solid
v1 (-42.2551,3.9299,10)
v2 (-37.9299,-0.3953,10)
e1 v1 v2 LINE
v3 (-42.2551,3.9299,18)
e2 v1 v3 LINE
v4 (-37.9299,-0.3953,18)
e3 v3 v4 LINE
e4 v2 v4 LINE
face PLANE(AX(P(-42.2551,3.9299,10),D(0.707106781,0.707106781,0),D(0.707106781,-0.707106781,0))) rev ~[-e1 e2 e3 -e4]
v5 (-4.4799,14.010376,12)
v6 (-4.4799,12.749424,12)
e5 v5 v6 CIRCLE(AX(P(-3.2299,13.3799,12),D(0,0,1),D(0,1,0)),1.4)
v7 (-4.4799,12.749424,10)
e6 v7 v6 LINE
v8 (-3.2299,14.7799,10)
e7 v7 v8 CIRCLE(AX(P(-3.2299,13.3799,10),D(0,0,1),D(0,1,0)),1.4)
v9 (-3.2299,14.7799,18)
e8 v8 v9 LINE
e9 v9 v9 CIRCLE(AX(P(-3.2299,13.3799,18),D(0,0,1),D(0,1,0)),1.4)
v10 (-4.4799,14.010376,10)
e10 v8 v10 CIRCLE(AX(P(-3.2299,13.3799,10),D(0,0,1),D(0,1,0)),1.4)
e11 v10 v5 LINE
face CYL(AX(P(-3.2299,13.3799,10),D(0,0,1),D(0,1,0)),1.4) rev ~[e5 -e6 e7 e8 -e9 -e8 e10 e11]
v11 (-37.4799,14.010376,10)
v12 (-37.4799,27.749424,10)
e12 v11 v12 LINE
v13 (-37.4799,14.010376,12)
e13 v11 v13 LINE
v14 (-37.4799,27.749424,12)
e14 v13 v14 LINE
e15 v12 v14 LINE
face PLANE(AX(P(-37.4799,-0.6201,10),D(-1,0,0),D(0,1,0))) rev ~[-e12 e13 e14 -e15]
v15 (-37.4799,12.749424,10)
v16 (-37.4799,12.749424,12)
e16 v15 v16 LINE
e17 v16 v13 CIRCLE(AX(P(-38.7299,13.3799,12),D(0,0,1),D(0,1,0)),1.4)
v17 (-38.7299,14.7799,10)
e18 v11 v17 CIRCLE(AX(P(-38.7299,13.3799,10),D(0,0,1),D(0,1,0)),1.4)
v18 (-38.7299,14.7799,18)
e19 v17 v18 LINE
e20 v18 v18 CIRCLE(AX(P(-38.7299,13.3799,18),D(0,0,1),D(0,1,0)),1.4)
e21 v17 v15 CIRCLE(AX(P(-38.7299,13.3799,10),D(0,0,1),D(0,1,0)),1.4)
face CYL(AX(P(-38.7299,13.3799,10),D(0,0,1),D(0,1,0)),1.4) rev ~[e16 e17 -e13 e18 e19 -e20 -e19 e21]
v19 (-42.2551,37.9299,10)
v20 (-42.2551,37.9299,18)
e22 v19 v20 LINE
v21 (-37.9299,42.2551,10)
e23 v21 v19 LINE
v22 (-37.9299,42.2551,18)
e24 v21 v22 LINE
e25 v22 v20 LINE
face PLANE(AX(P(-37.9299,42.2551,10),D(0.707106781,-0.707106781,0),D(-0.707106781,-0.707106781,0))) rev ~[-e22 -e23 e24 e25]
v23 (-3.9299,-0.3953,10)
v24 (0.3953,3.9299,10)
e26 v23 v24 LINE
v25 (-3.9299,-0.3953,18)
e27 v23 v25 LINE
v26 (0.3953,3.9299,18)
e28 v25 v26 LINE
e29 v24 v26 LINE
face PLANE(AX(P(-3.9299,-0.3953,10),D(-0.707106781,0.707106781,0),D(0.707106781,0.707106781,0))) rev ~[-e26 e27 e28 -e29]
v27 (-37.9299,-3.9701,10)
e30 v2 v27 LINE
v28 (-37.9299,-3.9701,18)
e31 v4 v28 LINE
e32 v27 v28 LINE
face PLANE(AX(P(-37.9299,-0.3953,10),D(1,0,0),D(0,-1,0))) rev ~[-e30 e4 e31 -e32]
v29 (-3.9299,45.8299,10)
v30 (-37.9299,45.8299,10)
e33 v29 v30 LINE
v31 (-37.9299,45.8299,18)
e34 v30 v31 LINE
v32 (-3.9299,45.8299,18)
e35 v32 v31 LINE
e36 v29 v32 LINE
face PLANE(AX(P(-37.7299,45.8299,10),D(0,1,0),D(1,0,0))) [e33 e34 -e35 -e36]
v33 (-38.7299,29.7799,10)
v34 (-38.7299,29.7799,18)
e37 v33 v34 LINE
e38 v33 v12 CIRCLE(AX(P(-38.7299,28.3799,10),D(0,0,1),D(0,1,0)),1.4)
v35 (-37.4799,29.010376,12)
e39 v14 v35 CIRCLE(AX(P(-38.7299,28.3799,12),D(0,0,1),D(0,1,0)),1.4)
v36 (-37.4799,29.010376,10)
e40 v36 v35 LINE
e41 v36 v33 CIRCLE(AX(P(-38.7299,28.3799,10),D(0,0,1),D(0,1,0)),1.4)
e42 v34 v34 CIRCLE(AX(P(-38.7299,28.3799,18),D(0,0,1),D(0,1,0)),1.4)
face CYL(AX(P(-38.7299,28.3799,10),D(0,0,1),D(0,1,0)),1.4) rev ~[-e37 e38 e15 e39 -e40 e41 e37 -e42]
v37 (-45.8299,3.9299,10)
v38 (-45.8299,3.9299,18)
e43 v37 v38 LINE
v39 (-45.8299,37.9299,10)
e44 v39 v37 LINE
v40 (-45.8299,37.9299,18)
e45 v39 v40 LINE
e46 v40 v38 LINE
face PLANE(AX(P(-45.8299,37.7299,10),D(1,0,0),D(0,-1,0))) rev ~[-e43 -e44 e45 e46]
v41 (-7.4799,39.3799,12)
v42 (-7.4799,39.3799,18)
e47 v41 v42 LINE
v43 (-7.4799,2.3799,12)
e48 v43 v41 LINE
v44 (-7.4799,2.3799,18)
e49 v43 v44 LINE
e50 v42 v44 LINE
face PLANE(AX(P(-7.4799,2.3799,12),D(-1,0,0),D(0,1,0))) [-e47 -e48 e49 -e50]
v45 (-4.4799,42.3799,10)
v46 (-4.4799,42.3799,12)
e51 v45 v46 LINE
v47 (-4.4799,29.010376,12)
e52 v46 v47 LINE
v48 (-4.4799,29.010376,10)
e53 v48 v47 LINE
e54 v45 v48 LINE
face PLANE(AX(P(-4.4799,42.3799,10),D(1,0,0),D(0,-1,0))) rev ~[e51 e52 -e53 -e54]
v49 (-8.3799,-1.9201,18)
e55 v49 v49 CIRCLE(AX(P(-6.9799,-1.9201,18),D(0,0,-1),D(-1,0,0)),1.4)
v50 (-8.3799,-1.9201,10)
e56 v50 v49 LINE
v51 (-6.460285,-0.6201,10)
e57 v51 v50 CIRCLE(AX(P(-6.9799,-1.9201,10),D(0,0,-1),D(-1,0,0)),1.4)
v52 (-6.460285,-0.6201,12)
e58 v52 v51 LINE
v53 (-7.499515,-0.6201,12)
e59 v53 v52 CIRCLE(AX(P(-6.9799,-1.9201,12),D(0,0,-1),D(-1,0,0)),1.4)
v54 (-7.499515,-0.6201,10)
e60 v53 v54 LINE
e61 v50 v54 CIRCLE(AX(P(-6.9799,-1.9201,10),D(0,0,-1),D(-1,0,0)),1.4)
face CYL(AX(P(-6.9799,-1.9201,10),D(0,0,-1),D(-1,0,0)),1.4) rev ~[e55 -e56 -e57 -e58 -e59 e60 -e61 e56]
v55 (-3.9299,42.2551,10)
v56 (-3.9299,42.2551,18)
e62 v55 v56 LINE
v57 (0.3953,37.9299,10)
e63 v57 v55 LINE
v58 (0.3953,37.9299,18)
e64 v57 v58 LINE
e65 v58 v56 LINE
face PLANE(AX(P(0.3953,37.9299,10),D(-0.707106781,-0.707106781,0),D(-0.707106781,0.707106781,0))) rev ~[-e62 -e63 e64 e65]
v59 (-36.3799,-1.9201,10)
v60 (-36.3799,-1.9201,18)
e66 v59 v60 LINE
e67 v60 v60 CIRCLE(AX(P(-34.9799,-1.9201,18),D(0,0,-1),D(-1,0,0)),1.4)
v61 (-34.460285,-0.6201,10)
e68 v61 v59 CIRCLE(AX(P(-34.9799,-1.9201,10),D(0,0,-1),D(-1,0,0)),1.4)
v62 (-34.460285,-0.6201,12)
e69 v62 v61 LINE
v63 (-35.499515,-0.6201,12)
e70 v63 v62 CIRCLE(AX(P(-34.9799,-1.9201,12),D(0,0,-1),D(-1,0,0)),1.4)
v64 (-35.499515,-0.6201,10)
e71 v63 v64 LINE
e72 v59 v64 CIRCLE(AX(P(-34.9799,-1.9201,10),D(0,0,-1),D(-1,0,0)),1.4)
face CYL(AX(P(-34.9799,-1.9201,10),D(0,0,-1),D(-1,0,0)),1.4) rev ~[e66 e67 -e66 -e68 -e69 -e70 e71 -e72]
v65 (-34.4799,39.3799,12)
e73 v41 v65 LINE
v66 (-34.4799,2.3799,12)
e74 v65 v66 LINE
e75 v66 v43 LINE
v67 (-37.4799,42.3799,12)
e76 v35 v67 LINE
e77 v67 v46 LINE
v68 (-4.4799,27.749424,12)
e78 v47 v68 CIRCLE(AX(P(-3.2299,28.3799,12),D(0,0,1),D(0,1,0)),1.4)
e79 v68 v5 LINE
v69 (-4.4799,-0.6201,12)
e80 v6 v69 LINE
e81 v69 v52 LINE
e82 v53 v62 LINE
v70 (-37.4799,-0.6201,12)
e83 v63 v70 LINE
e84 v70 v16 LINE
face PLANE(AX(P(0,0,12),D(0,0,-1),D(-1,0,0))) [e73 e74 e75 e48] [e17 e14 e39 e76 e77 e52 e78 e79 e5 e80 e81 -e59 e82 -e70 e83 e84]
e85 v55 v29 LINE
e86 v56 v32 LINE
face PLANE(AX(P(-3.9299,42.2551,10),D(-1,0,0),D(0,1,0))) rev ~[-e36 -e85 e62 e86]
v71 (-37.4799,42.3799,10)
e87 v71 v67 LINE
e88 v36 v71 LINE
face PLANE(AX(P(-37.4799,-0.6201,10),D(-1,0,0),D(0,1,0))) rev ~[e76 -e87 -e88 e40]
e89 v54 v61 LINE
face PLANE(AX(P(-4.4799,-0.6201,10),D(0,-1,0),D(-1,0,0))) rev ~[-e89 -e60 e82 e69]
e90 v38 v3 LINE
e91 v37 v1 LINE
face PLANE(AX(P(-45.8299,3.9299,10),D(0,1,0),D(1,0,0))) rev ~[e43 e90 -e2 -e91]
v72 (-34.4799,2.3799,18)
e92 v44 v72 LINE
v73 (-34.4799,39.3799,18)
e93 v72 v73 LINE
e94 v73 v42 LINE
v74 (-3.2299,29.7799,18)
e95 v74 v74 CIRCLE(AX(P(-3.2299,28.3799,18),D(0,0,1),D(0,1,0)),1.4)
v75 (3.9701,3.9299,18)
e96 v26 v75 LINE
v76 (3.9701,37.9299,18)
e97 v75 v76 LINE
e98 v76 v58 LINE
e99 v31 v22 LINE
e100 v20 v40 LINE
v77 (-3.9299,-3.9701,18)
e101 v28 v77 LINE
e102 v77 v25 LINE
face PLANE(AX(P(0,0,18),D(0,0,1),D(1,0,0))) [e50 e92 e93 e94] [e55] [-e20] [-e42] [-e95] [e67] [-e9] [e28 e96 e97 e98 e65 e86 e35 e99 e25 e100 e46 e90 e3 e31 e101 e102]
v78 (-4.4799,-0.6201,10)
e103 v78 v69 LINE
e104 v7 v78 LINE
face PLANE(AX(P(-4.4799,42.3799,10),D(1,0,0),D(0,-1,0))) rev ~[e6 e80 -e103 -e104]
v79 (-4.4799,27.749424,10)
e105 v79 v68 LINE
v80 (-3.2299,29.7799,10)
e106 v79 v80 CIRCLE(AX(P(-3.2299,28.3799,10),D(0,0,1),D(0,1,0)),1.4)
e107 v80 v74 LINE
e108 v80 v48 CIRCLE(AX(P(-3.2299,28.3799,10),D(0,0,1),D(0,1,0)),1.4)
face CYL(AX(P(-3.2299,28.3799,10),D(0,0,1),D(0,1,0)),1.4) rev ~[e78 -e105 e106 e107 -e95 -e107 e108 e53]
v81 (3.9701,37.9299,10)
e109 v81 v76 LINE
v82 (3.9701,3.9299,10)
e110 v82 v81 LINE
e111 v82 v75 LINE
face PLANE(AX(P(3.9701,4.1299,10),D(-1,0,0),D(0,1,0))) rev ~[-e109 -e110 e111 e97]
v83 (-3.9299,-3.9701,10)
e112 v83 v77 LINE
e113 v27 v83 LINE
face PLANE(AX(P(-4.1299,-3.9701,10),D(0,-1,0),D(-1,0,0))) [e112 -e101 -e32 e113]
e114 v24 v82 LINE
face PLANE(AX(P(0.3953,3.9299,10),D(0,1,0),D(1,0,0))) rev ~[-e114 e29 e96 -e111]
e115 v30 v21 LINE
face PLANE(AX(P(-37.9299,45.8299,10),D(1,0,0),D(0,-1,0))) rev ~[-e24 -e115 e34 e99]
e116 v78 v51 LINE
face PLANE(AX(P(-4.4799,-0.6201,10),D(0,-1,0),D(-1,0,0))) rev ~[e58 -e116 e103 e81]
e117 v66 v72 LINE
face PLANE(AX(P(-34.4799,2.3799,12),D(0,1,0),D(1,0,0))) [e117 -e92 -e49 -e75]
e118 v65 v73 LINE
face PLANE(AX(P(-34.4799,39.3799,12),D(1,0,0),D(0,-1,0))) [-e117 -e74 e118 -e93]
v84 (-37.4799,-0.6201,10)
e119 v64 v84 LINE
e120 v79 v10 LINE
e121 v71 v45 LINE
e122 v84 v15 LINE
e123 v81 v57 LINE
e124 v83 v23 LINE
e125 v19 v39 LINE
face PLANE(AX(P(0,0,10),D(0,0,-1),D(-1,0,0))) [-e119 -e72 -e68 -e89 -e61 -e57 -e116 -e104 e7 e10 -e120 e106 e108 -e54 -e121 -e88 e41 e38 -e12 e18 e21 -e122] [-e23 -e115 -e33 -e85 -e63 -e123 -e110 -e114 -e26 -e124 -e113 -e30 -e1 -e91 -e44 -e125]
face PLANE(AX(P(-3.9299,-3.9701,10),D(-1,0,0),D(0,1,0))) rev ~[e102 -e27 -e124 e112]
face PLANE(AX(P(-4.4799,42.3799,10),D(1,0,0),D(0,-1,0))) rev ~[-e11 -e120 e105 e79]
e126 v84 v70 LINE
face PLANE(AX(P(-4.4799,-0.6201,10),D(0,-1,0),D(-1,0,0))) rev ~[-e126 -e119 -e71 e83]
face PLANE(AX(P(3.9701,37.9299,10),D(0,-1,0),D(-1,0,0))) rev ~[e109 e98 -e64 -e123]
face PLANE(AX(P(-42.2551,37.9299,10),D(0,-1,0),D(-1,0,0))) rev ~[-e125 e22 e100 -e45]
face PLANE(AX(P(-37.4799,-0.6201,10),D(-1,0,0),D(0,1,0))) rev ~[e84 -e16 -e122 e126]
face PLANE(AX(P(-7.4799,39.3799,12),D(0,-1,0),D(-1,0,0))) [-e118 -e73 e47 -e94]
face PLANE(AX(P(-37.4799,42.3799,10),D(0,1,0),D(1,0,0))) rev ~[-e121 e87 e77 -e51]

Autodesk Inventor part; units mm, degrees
ref_plane "YZ Plane" through (0, 0, 0) normal (1, 0, 0) x (0, 1, 0)
ref_plane "XZ Plane" through (0, 0, 0) normal (0, 1, 0) x (-1, 0, 0)
ref_plane "Work Plane1" through (0, 0, 10) normal (0, 0, 1) x (1, 0, 0)
sketch "Sketch1" plane through (0, 0, 10) normal (0, 0, 1) x (1, 0, 0)
  line L0 (-4.0299, -0.3538) -> (-2.2322, 1.4439) construction
  arc A0 (-1.4439, 2.2322) -> (-2.2322, 1.4439) centre (-0.9299, 0.9299) ccw construction
  line L1 (-1.4439, 2.2322) -> (0.3538, 4.0299) construction
  line L2 (-37.8299, 42.2137) -> (-37.8299, 45.8299) construction
  line L3 (-37.8299, 45.8299) -> (-4.0299, 45.8299) construction
  line L4 (-4.0299, 45.8299) -> (-4.0299, 42.2137) construction
  line L5 (-4.0299, 4.0299) -> (0.3538, 4.0299) projected
  circle A1 centre (-20.9299, 20.9299) radius 17.5 construction
  line L6 (-20.9299, 58.9723) -> (17.1124, 20.9299) construction
  line L7 (17.1124, 20.9299) -> (-20.9299, -17.1124) construction
  line L8 (-20.9299, -17.1124) -> (-58.9723, 20.9299) construction
  line L9 (-58.9723, 20.9299) -> (-20.9299, 58.9723) construction
  line L10 (-20.9299, 58.9723) -> (-20.9299, -17.1124) construction
  line L11 (17.1124, 20.9299) -> (-58.9723, 20.9299) construction
  line L12 (-20.9299, 58.9723) -> (32.8701, 58.9723) construction
  line L13 (-43.2198, 43.4299) -> (1.7802, 43.4299) construction
  line L14 (1.7802, 43.4299) -> (1.7802, -1.5701) construction
  line L15 (1.7802, -1.5701) -> (-43.2198, -1.5701) construction
  line L16 (-43.2198, -1.5701) -> (-43.2198, 43.4299) construction
  line L17 (-43.2198, 5.1774) -> (-43.2198, 36.6824)
  line L18 (-43.2198, 36.6824) -> (-36.4723, 43.4299)
  line L19 (-36.4723, 43.4299) -> (-5.3876, 43.4299)
  line L20 (-5.3876, 43.4299) -> (1.7802, 36.2621)
  line L21 (1.7802, 36.2621) -> (1.7802, 5.5977)
  line L22 (1.7802, 5.5977) -> (-5.3876, -1.5701)
  line L23 (-5.3876, -1.5701) -> (-36.4723, -1.5701)
  line L24 (-36.4723, -1.5701) -> (-43.2198, 5.1774)
  line L25 (-4.0299, 42.2137) -> (-37.8299, 42.2137) projected
  line L26 (-4.0299, -0.3538) -> (-4.0299, 4.0299) projected
  line L27 (-43.2198, 43.4299) -> (-10.4667, 10.6769) construction
  line L28 (-8.5595, 8.5517) -> (1.7802, -1.5701) construction
  line L29 (1.7802, 43.4299) -> (-25.699, 15.9507) construction
  line L30 (-30.9728, 10.6769) -> (-43.2198, -1.5701) construction
  point P0 (-37.8299, 4.0299)
  dimension "d18" = 53.8
  dimension "d19" = 45
  dimension "d20" = 53.8
  dimension "d21" = 45
  dimension "d22" = 45
extrude "Extrusion1" add sketch "Sketch1" along normal blind 8
sketch "Sketch3" plane through (0, 0, 10) normal (0, 0, -1) x (-1, 0, 0)
  line L0 (37.8299, -0.4701) -> (37.8299, 4.0299) construction
  line L1 (4.0299, 4.0299) -> (4.0299, -0.4701) construction
  line L2 (37.8299, -0.4701) -> (37.8299, 1.1886) construction
  line L3 (4.0299, -3.9701) -> (4.0299, -0.3538) construction
  line L4 (45.8299, 4.0299) -> (42.2137, 4.0299) construction
  line L5 (-0.3538, 4.0299) -> (-3.9701, 4.0299) construction
  line L6 (-3.9701, 37.8299) -> (-0.3538, 37.8299) construction
  line L7 (4.0299, 42.2137) -> (4.0299, 45.8299) construction
  line L8 (37.8299, 45.8299) -> (37.8299, 42.2137) construction
  line L9 (42.2137, 37.8299) -> (45.8299, 37.8299) construction
  line L10 (37.8299, 37.7299) -> (45.8299, 37.7299)
  line L11 (45.8299, 37.7299) -> (45.8299, 4.1299)
  line L12 (45.8299, 4.1299) -> (37.8299, 4.1299)
  line L13 (37.8299, 4.1299) -> (37.8299, 37.7299)
  line L14 (37.7299, 4.0299) -> (4.1299, 4.0299)
  line L15 (4.1299, 4.0299) -> (4.1299, -3.9701)
  line L16 (4.1299, -3.9701) -> (37.7299, -3.9701)
  line L17 (37.7299, -3.9701) -> (37.7299, 4.0299)
  line L18 (4.0299, 4.1299) -> (-3.9701, 4.1299)
  line L19 (-3.9701, 4.1299) -> (-3.9701, 37.7299)
  line L20 (-3.9701, 37.7299) -> (4.0299, 37.7299)
  line L21 (4.0299, 37.7299) -> (4.0299, 4.1299)
  line L22 (4.1299, 37.8299) -> (37.7299, 37.8299)
  line L23 (37.7299, 37.8299) -> (37.7299, 45.8299)
  line L24 (37.7299, 45.8299) -> (4.1299, 45.8299)
  line L25 (4.1299, 45.8299) -> (4.1299, 37.8299)
  point P0 (0, 0)
  dimension "d23" = 0.1
  dimension "d24" = 0.1
  dimension "d25" = 0.1
  dimension "d26" = 0.1
  dimension "d27" = 0.1
extrude "Extrusion3" add sketch "Sketch3" against normal up to surface (8 mm away)
sketch "Skizze12" plane through (0, 0, 10) normal (0, 0, -1) x (-1, 0, 0)
  line L0 (-0.3124, 4.1299) -> (4.1299, -0.3124) projected
  line L1 (4.1299, -0.3124) -> (4.1299, -3.9701) projected
  line L2 (4.1299, -3.9701) -> (37.7299, -3.9701) construction
  line L3 (37.7299, -3.9701) -> (37.7299, -0.3124) projected
  line L4 (37.7299, -0.3124) -> (42.1723, 4.1299) projected
  line L5 (45.8299, 4.1299) -> (42.1723, 4.1299) projected
  line L6 (45.8299, 37.7299) -> (45.8299, 4.1299) construction
  line L7 (42.1723, 37.7299) -> (45.8299, 37.7299) projected
  line L8 (42.1723, 37.7299) -> (37.7299, 42.1723) projected
  line L9 (37.7299, 42.1723) -> (37.7299, 45.8299) projected
  line L10 (37.7299, 45.8299) -> (4.1299, 45.8299) construction
  line L11 (4.1299, 45.8299) -> (4.1299, 42.1723) projected
  line L12 (4.1299, 42.1723) -> (-0.3124, 37.7299) projected
  line L13 (-3.9701, 37.7299) -> (-0.3124, 37.7299) projected
  line L14 (-3.9701, 4.1299) -> (-3.9701, 37.7299) construction
  line L15 (-0.3124, 4.1299) -> (-3.9701, 4.1299) projected
  line L16 (37.9299, -4.1701) -> (3.9299, -4.1701) construction
  line L17 (3.9299, -4.1701) -> (3.9299, -0.3953)
  line L18 (3.9299, -0.3953) -> (-0.3953, 3.9299)
  line L19 (-0.3953, 3.9299) -> (-4.1701, 3.9299)
  line L20 (-4.1701, 3.9299) -> (-4.1701, 37.9299) construction
  line L21 (-4.1701, 37.9299) -> (-0.3953, 37.9299)
  line L22 (-0.3953, 37.9299) -> (3.9299, 42.2551)
  line L23 (3.9299, 42.2551) -> (3.9299, 46.0299)
  line L24 (3.9299, 46.0299) -> (37.9299, 46.0299) construction
  line L25 (37.9299, 46.0299) -> (37.9299, 42.2551)
  line L26 (37.9299, 42.2551) -> (42.2551, 37.9299)
  line L27 (42.2551, 37.9299) -> (46.0299, 37.9299)
  line L28 (46.0299, 37.9299) -> (46.0299, 3.9299) construction
  line L29 (46.0299, 3.9299) -> (42.2551, 3.9299)
  line L30 (42.2551, 3.9299) -> (37.9299, -0.3953)
  line L31 (37.9299, -0.3953) -> (37.9299, -4.1701)
  line L32 (-3.9701, 37.7299) -> (-3.9701, 37.9299)
  line L33 (37.7299, 45.8299) -> (4.1299, 45.8299) projected
  line L34 (4.1299, 45.8299) -> (3.9299, 45.8299)
  line L35 (37.7299, 45.8299) -> (37.9299, 45.8299)
  line L36 (45.8299, 37.7299) -> (45.8299, 37.9299)
  line L37 (45.8299, 4.1299) -> (45.8299, 3.9299)
  line L38 (37.7299, -3.9701) -> (37.9299, -3.9701)
  line L39 (4.1299, -3.9701) -> (3.9299, -3.9701)
  line L40 (-3.9701, 4.1299) -> (-3.9701, 3.9299)
  point P0 (0, 0)
  dimension "d65" = 0.2
extrude "IM_offset" add sketch "Skizze12" against normal up to surface (8 mm away)
sketch "Sketch15" plane through (0, 0, 10) normal (0, 0, -1) x (-1, 0, 0)
  line L0 (-3.9701, 3.9299) -> (-3.9701, 37.9299) projected
  line L1 (-0.3953, 3.9299) -> (-3.9701, 3.9299) projected
  line L2 (3.9299, -0.3953) -> (-0.3953, 3.9299) projected
  line L3 (3.9299, -3.9701) -> (3.9299, -0.3953) projected
  line L4 (3.9299, -3.9701) -> (37.9299, -3.9701) projected
  line L5 (37.9299, -0.3953) -> (37.9299, -3.9701) projected
  line L6 (42.2551, 3.9299) -> (37.9299, -0.3953) projected
  line L7 (45.8299, 3.9299) -> (42.2551, 3.9299) projected
  line L8 (45.8299, 3.9299) -> (45.8299, 37.9299) projected
  line L9 (45.8299, 37.9299) -> (42.2551, 37.9299) projected
  line L10 (42.2551, 37.9299) -> (37.9299, 42.2551) projected
  line L11 (37.9299, 42.2551) -> (37.9299, 45.8299) projected
  line L12 (37.9299, 45.8299) -> (3.9299, 45.8299) projected
  line L13 (3.9299, 45.8299) -> (3.9299, 42.2551) projected
  line L14 (3.9299, 42.2551) -> (-0.3953, 37.9299) projected
  line L15 (-0.3953, 37.9299) -> (-3.9701, 37.9299) projected
  line L16 (37.4799, 42.3799) -> (4.4799, 42.3799)
  line L17 (4.4799, 42.3799) -> (4.4799, -0.6201)
  line L18 (4.4799, -0.6201) -> (37.4799, -0.6201)
  line L19 (37.4799, -0.6201) -> (37.4799, 42.3799)
  line L20 (37.4799, 42.3799) -> (4.4799, -0.6201) construction
  line L21 (4.4799, 42.3799) -> (37.4799, -0.6201) construction
  circle A0 centre (20.9799, 20.8799) radius 16.97 construction
  point P0 (0, 0)
  dimension "d73" = 33
  dimension "d74" = 43
  dimension "d90" = 21.5
  dimension "d91" = 16.5
extrude "Extrusion13" cut sketch "Sketch15" against normal blind 2 contours L19 L18 L17 L16
sketch "Sketch16" plane through (0, 0, 12) normal (0, 0, -1) x (-1, 0, 0)
  line L0 (4.4799, 42.3799) -> (37.4799, 42.3799) projected
  line L1 (4.4799, -0.6201) -> (4.4799, 42.3799) projected
  line L2 (37.4799, -0.6201) -> (4.4799, -0.6201) projected
  line L3 (37.4799, 42.3799) -> (37.4799, -0.6201) projected
  line L4 (7.4799, 39.3799) -> (34.4799, 39.3799)
  line L5 (34.4799, 39.3799) -> (34.4799, 2.3799)
  line L6 (34.4799, 2.3799) -> (7.4799, 2.3799)
  line L7 (7.4799, 2.3799) -> (7.4799, 39.3799)
  dimension "d94" = 3
extrude "Extrusion14" cut sketch "Sketch16" against normal through all contours L4 L5 L6 L7
sketch "Sketch17" plane through (0, 0, 10) normal (0, 0, -1) x (-1, 0, 0)
  line L0 (37.4799, 42.3799) -> (37.4799, -0.6201) projected
  line L1 (4.4799, -0.6201) -> (4.4799, 42.3799) projected
  line L2 (38.7299, 28.3799) -> (3.2299, 28.3799)
  line L3 (3.2299, 28.3799) -> (3.2299, 13.3799)
  line L4 (3.2299, 13.3799) -> (38.7299, 13.3799)
  line L5 (38.7299, 13.3799) -> (38.7299, 28.3799)
  line L6 (38.7299, 28.3799) -> (3.2299, 13.3799) construction
  line L7 (3.2299, 28.3799) -> (38.7299, 13.3799) construction
  line L8 (4.4799, 42.3799) -> (37.4799, 42.3799) projected
  circle A0 centre (20.9799, 20.8799) radius 16.97 construction
  line L9 (37.4799, -0.6201) -> (4.4799, -0.6201) projected
  point P0 (0, 0)
  dimension "d81" = 35.5
  dimension "d82" = 15
  dimension "d92" = 0
  dimension "d93" = 0
hole "Hole1" at (-3.2299, 13.3799, 10) at (-3.2299, 28.3799, 10) at (-38.7299, 28.3799, 10) at (-38.7299, 13.3799, 10) direction (0, 0, 1) diameter 2.8 end through all
sketch "Sketch18" plane through (0, 0, 10) normal (0, 0, -1) x (-1, 0, 0)
  line L0 (45.3299, 43.7299) -> (45.3299, -1.9701) projected
  line L1 (37.9499, -0.2701) -> (37.9499, -3.9701) projected
  line L2 (4.0099, -3.9701) -> (4.0099, 0.1299) projected
  circle A0 centre (6.9799, -1.9201) radius 1.4
  circle A1 centre (34.9799, -1.9201) radius 1.4
  circle A2 centre (20.9799, 20.8799) radius 16.97 construction
  circle A3 centre (20.9799, 20.8799) radius 16.97 construction
  point P0 (0, 0)
  dimension "d95" = 2.8
  dimension "d96" = 2.8
  dimension "d97" = 14
  dimension "d98" = 14
extrude "Extrusion15" cut sketch "Sketch18" against normal blind 10
properties part number "20_Cube_Insert_RaspiCam_v3"
